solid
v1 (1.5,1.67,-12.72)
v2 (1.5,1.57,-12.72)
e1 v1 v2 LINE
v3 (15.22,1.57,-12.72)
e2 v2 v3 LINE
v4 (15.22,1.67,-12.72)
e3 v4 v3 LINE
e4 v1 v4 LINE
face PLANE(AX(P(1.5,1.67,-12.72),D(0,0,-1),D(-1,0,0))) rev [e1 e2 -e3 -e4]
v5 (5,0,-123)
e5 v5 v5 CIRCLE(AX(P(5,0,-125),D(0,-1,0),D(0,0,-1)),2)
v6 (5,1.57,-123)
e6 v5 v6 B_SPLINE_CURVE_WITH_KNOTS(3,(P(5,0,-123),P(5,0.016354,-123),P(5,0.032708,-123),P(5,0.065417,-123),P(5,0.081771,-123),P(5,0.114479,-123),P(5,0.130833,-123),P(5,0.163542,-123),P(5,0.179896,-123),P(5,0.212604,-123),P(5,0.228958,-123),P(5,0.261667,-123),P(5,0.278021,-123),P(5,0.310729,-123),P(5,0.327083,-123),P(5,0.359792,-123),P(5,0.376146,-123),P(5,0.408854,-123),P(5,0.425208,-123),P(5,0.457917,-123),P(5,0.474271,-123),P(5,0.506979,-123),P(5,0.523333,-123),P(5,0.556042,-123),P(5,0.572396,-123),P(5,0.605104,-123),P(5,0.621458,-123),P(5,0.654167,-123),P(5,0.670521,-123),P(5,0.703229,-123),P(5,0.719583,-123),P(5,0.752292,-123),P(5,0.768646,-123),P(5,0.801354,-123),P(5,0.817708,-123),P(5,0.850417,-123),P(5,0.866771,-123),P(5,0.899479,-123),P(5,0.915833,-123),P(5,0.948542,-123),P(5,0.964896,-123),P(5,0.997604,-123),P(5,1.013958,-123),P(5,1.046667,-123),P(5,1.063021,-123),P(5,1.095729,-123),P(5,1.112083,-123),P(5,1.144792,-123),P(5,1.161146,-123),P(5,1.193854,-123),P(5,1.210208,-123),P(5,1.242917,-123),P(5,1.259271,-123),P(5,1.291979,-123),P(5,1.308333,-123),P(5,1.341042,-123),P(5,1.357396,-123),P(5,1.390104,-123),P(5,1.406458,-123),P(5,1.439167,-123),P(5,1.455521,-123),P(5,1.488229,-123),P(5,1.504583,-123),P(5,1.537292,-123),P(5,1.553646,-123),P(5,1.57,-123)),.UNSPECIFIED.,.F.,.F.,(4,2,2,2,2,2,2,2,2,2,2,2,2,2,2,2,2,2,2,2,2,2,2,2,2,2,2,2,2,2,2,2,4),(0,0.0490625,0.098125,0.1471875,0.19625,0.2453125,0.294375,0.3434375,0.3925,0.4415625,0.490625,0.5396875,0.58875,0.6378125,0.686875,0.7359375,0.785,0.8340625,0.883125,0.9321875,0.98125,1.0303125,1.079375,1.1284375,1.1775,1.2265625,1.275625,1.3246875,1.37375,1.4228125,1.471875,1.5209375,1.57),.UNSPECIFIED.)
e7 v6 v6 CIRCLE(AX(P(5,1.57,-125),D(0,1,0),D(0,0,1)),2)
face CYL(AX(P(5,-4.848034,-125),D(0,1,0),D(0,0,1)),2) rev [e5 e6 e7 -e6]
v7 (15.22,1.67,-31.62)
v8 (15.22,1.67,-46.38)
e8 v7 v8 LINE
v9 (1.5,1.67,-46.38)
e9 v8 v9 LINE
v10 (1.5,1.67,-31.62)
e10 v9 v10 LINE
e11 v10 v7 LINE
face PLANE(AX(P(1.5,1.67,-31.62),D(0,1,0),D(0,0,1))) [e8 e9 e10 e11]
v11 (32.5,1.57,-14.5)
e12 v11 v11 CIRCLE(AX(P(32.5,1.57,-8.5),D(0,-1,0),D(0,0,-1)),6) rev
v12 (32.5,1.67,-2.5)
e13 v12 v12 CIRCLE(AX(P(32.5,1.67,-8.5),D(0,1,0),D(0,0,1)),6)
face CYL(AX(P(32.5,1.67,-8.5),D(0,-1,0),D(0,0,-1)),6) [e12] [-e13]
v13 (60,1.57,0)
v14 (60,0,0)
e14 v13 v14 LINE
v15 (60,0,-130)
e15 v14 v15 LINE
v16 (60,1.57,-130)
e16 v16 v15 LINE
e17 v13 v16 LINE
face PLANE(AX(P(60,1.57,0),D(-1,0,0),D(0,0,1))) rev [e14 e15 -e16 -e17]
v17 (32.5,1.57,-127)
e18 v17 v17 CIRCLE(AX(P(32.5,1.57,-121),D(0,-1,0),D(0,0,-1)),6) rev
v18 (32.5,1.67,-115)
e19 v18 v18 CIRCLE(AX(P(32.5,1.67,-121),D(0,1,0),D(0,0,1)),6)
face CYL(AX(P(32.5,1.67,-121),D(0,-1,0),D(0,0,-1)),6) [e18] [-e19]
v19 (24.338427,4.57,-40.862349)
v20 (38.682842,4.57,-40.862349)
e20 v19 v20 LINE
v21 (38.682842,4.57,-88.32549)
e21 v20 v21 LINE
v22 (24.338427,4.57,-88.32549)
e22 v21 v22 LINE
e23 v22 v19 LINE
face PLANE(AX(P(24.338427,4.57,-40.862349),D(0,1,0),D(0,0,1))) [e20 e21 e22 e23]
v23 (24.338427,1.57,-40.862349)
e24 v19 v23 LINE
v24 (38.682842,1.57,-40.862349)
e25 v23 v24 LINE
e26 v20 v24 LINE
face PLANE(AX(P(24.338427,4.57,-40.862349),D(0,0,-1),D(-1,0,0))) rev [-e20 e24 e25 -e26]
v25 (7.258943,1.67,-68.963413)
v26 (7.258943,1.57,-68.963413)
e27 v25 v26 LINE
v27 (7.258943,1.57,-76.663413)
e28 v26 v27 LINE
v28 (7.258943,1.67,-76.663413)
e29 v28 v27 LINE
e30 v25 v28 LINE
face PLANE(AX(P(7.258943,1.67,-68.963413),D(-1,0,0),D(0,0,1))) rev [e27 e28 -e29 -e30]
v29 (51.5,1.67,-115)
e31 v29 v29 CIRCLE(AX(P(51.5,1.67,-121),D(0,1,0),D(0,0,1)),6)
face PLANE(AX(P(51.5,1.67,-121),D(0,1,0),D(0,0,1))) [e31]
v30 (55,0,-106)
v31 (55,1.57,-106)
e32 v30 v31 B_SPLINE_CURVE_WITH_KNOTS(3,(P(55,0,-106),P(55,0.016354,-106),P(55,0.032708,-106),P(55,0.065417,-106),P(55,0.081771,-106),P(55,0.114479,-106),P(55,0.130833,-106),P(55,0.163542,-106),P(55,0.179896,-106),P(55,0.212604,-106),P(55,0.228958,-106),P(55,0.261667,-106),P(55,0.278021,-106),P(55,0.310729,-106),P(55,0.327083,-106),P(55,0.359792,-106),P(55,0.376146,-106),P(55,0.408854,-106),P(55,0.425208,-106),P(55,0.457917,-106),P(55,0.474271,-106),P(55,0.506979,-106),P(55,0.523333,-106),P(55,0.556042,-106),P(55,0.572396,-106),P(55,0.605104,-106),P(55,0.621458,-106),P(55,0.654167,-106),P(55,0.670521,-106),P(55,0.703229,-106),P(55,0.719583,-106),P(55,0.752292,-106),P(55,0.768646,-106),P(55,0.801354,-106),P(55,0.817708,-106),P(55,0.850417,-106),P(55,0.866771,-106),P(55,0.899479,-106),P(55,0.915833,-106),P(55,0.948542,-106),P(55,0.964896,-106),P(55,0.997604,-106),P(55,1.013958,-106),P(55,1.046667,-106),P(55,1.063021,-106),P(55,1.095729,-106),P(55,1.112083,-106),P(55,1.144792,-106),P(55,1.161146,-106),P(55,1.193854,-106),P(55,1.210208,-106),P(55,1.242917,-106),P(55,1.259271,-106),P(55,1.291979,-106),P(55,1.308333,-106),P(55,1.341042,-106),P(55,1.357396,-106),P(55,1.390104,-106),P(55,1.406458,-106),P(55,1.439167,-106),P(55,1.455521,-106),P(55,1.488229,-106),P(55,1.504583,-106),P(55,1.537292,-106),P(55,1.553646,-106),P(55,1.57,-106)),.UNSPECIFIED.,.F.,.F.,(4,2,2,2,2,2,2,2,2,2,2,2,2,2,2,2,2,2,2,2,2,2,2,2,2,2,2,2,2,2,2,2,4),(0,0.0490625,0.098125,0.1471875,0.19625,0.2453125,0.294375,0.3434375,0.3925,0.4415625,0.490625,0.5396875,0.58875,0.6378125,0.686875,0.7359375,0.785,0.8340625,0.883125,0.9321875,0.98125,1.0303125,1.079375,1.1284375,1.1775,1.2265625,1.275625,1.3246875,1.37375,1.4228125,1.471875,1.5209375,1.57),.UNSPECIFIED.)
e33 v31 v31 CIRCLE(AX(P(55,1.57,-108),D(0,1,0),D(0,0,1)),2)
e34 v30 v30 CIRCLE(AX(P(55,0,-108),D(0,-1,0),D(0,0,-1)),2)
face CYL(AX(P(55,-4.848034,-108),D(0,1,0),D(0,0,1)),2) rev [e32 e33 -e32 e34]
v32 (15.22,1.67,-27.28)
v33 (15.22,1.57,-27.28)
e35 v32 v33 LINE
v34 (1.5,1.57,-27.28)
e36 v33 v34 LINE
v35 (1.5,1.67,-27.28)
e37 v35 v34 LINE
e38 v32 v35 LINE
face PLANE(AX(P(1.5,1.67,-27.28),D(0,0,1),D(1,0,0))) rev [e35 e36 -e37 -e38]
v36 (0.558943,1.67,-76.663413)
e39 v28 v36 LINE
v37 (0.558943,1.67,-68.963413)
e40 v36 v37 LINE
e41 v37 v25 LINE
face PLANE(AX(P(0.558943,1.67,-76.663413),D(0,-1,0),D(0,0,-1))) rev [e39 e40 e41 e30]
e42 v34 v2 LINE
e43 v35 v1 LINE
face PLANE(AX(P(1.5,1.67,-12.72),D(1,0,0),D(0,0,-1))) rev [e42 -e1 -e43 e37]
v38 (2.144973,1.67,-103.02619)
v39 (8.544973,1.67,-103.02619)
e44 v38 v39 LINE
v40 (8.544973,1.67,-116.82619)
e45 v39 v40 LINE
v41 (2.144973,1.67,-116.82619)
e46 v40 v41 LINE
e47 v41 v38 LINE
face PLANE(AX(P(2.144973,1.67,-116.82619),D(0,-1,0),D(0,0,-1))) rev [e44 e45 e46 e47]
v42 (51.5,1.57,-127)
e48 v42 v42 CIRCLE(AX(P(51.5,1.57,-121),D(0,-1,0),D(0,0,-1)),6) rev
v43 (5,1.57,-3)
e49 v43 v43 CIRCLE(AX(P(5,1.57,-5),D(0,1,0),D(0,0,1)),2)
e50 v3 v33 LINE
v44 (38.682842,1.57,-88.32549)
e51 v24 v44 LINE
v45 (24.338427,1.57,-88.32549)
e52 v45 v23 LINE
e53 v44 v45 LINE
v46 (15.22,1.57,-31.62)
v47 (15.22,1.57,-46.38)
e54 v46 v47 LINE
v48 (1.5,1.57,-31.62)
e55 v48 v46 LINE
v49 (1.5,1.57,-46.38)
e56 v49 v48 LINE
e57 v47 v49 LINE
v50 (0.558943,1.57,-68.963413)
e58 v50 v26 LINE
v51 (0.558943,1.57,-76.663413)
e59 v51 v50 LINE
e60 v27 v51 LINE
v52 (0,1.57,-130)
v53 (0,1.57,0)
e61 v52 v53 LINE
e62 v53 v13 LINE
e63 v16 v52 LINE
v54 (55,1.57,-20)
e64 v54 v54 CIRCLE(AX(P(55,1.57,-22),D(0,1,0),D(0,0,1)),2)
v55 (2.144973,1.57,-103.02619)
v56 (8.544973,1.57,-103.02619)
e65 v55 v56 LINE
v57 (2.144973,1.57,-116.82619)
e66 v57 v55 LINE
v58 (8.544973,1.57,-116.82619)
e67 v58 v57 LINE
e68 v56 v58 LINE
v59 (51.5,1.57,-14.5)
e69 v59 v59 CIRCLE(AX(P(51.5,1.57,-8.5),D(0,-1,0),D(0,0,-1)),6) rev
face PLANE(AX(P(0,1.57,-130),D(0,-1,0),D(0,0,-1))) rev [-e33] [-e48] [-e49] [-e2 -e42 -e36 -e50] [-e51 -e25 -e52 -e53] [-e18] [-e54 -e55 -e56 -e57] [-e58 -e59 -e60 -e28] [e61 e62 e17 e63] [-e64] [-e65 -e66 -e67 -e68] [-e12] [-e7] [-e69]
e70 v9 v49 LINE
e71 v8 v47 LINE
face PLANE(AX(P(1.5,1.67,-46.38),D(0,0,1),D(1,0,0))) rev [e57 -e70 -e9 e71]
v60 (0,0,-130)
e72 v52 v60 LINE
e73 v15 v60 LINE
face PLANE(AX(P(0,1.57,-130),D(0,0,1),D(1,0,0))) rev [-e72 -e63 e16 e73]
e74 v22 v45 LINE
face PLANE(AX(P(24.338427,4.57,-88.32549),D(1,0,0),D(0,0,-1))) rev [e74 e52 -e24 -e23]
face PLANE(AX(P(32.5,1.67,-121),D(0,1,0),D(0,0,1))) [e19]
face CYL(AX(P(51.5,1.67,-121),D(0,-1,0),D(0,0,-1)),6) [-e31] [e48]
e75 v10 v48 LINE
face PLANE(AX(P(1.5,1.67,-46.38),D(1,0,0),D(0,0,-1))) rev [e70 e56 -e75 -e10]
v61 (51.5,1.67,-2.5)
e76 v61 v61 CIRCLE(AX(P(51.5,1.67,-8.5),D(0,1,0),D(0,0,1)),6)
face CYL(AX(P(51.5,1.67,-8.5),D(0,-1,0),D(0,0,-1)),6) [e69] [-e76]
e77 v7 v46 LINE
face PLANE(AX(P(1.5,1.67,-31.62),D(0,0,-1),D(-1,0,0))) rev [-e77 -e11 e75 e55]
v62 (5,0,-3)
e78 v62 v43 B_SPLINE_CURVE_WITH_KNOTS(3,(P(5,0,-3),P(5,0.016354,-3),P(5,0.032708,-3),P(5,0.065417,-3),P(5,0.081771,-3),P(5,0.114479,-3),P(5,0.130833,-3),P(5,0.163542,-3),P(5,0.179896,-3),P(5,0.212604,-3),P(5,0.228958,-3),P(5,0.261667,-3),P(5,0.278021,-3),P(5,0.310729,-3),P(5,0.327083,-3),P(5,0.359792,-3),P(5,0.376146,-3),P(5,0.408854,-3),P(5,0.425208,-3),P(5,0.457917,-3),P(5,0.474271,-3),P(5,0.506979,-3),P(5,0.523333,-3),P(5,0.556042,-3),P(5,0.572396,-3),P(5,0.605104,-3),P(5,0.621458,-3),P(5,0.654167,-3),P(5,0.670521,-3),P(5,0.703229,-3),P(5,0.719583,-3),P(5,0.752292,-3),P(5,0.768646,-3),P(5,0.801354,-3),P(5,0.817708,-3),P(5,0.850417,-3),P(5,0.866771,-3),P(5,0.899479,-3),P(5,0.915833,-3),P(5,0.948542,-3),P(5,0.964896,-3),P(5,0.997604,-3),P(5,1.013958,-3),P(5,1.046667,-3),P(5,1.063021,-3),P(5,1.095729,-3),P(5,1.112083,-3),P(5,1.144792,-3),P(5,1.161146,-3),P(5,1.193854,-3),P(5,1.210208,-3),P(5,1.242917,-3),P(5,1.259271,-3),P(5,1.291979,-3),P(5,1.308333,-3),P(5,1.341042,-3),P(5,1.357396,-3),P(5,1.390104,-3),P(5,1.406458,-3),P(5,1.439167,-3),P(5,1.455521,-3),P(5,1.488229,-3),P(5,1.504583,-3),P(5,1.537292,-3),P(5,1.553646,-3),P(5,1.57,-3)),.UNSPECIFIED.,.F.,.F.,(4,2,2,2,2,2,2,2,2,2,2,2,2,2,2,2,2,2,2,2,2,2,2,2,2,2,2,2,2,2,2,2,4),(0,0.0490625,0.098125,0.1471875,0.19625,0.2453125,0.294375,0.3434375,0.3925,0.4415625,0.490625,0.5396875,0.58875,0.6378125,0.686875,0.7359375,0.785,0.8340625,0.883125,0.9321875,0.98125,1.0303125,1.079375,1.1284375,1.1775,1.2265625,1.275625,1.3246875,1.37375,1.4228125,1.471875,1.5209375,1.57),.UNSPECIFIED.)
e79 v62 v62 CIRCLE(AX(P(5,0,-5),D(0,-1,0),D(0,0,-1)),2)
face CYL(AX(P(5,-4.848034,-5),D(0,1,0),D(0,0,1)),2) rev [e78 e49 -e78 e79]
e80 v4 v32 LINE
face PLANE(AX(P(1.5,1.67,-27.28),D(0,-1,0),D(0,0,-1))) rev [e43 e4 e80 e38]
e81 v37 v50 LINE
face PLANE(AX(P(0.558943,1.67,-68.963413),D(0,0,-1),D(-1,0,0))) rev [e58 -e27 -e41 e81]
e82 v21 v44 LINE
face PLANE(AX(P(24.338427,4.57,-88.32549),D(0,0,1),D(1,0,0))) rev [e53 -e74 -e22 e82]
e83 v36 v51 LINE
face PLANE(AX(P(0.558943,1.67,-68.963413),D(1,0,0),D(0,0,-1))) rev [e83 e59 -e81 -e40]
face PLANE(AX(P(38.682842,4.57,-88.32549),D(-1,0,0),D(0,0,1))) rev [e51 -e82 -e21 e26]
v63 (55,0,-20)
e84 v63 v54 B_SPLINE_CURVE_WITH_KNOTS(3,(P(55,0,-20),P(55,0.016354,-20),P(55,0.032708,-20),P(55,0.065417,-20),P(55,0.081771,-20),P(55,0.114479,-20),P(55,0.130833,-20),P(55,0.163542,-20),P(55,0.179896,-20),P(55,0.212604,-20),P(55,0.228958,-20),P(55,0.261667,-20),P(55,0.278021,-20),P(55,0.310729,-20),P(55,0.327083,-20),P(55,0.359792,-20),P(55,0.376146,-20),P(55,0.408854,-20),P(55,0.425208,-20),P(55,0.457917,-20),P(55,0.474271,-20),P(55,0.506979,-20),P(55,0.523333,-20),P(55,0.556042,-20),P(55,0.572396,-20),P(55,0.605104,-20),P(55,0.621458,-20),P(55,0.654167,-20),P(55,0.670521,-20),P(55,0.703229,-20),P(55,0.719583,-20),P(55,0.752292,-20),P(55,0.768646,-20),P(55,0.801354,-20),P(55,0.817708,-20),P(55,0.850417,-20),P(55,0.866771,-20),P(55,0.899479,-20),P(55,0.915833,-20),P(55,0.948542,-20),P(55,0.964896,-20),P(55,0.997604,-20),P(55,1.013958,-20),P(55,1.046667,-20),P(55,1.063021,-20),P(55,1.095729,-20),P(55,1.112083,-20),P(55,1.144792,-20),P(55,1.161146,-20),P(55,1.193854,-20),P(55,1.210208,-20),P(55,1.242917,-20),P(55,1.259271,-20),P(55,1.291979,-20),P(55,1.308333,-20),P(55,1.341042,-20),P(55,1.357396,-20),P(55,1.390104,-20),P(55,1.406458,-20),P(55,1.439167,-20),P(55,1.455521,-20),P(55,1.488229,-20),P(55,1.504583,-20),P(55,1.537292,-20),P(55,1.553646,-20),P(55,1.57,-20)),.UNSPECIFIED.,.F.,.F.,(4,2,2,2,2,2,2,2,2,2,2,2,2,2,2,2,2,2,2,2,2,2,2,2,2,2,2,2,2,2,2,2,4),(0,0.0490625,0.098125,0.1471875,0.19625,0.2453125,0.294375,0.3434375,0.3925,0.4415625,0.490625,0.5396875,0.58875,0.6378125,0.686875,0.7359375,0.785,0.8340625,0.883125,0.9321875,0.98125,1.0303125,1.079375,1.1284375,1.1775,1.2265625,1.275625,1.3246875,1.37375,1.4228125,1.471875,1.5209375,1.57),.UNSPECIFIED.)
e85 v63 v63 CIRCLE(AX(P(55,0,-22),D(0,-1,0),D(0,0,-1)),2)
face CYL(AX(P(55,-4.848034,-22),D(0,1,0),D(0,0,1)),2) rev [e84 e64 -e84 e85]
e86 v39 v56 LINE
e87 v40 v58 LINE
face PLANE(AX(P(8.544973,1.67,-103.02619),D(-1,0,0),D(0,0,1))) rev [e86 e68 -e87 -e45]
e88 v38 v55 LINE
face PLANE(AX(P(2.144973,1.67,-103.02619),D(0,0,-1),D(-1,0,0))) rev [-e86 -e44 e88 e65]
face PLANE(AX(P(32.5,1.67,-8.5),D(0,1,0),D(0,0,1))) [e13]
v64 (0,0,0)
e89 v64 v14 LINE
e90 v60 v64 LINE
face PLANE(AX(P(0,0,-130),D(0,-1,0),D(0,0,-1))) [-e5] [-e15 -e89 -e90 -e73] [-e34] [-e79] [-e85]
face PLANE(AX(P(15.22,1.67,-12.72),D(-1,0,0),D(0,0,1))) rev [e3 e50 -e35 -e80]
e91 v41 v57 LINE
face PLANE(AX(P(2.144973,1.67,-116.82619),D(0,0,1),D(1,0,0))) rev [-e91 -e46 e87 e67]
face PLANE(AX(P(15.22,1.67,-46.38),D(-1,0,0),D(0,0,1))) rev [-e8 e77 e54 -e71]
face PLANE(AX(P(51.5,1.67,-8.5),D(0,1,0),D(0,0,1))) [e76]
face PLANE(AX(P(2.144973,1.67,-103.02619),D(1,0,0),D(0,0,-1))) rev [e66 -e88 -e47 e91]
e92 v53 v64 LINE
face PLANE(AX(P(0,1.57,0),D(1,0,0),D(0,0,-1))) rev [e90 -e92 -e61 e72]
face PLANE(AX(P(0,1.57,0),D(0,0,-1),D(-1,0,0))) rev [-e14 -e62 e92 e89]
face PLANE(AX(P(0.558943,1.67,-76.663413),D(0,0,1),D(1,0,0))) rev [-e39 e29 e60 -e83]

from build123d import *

# Parameters (mm, degrees)
SKETCH1_W               = 60
SKETCH1_H               = 130
BOSS_EXTRUDE1_DEPTH     = 1.57
SKETCH2_W               = 14.34441586
SKETCH2_H               = 47.463140714
BOSS_EXTRUDE2_DEPTH     = 3
BOSS_EXTRUDE6_START     = -1.57
BOSS_EXTRUDE6_OUTLINE_R = 2
BOSS_EXTRUDE6_DEPTH     = 1.57
SKETCH4_R               = 6
BOSS_EXTRUDE7_DEPTH     = 0.1
SKETCH5_W               = 13.72
SKETCH5_H               = 14.56
SKETCH5_H_2             = 14.76
BOSS_EXTRUDE8_DEPTH     = 0.1
SKETCH6_W               = 6.4
SKETCH6_H               = 13.8
BOSS_EXTRUDE9_DEPTH     = 0.1
SKETCH7_W               = 6.7
SKETCH7_H               = 7.7
BOSS_EXTRUDE10_DEPTH    = 0.1


# Read off the part's stored shape, not the designer's step: Boss-Extrude6
with BuildPart() as part:
    # Sketch1 → Boss-Extrude1 (new body)
    with BuildSketch(Plane(origin=(0, 0, 0), x_dir=(1, 0, 0), z_dir=(0, 1, 0))):
        with Locations((30, 65)):
            Rectangle(SKETCH1_W, SKETCH1_H)
    extrude(amount=BOSS_EXTRUDE1_DEPTH)

    # Sketch2 → Boss-Extrude2 (add)
    with BuildSketch(Plane(origin=(0, 1.57, 0), x_dir=(-1, 0, 0), z_dir=(0, 1, 0))):
        with Locations((-31.510634486, -64.593919343)):
            Rectangle(SKETCH2_W, SKETCH2_H)
    extrude(amount=BOSS_EXTRUDE2_DEPTH)

    # Boss-Extrude6 outline → Boss-Extrude6 (cut)
    with BuildSketch(Plane(origin=(0, 1.57, 0), x_dir=(-1, 0, 0), z_dir=(0, 1, 0)).offset(BOSS_EXTRUDE6_START)):
        with Locations((-5, -5)):
            Circle(BOSS_EXTRUDE6_OUTLINE_R)
        with Locations((-55, -22)):
            Circle(BOSS_EXTRUDE6_OUTLINE_R)
        with Locations((-5, -125)):
            Circle(BOSS_EXTRUDE6_OUTLINE_R)
        with Locations((-55, -108)):
            Circle(BOSS_EXTRUDE6_OUTLINE_R)
    extrude(amount=BOSS_EXTRUDE6_DEPTH, mode=Mode.SUBTRACT)

    # Sketch4 → Boss-Extrude7 (add)
    with BuildSketch(Plane(origin=(0, 1.57, 0), x_dir=(-1, 0, 0), z_dir=(0, 1, 0))):
        with Locations(Location((-32.5, -8.5, 0), (0, 0, 270))):
            Circle(SKETCH4_R)
        with Locations(Location((-51.5, -8.5, 0), (0, 0, 270))):
            Circle(SKETCH4_R)
        with Locations(Location((-32.5, -121, 0), (0, 0, 270))):
            Circle(SKETCH4_R)
        with Locations(Location((-51.5, -121, 0), (0, 0, 270))):
            Circle(SKETCH4_R)
    extrude(amount=BOSS_EXTRUDE7_DEPTH)

    # Sketch5 → Boss-Extrude8 (add)
    with BuildSketch(Plane(origin=(0, 1.57, 0), x_dir=(-1, 0, 0), z_dir=(0, 1, 0))):
        with Locations((-8.36, -20)):
            Rectangle(SKETCH5_W, SKETCH5_H)
        with Locations((-8.36, -39)):
            Rectangle(SKETCH5_W, SKETCH5_H_2)
    extrude(amount=BOSS_EXTRUDE8_DEPTH)

    # Sketch6 → Boss-Extrude9 (add)
    with BuildSketch(Plane(origin=(2.04497346, 1.57, -23.026190138), x_dir=(-1, 0, 0), z_dir=(0, 1, 0))):
        with Locations((-3.3, -86.9)):
            Rectangle(SKETCH6_W, SKETCH6_H)
    extrude(amount=BOSS_EXTRUDE9_DEPTH)

    # Sketch7 → Boss-Extrude10 (add)
    with BuildSketch(Plane(origin=(0.458943498, 1.57, 31.036587212), x_dir=(-1, 0, 0), z_dir=(0, 1, 0))):
        with Locations((-3.45, -103.85)):
            Rectangle(SKETCH7_W, SKETCH7_H)
    extrude(amount=BOSS_EXTRUDE10_DEPTH)


solid = part.part
